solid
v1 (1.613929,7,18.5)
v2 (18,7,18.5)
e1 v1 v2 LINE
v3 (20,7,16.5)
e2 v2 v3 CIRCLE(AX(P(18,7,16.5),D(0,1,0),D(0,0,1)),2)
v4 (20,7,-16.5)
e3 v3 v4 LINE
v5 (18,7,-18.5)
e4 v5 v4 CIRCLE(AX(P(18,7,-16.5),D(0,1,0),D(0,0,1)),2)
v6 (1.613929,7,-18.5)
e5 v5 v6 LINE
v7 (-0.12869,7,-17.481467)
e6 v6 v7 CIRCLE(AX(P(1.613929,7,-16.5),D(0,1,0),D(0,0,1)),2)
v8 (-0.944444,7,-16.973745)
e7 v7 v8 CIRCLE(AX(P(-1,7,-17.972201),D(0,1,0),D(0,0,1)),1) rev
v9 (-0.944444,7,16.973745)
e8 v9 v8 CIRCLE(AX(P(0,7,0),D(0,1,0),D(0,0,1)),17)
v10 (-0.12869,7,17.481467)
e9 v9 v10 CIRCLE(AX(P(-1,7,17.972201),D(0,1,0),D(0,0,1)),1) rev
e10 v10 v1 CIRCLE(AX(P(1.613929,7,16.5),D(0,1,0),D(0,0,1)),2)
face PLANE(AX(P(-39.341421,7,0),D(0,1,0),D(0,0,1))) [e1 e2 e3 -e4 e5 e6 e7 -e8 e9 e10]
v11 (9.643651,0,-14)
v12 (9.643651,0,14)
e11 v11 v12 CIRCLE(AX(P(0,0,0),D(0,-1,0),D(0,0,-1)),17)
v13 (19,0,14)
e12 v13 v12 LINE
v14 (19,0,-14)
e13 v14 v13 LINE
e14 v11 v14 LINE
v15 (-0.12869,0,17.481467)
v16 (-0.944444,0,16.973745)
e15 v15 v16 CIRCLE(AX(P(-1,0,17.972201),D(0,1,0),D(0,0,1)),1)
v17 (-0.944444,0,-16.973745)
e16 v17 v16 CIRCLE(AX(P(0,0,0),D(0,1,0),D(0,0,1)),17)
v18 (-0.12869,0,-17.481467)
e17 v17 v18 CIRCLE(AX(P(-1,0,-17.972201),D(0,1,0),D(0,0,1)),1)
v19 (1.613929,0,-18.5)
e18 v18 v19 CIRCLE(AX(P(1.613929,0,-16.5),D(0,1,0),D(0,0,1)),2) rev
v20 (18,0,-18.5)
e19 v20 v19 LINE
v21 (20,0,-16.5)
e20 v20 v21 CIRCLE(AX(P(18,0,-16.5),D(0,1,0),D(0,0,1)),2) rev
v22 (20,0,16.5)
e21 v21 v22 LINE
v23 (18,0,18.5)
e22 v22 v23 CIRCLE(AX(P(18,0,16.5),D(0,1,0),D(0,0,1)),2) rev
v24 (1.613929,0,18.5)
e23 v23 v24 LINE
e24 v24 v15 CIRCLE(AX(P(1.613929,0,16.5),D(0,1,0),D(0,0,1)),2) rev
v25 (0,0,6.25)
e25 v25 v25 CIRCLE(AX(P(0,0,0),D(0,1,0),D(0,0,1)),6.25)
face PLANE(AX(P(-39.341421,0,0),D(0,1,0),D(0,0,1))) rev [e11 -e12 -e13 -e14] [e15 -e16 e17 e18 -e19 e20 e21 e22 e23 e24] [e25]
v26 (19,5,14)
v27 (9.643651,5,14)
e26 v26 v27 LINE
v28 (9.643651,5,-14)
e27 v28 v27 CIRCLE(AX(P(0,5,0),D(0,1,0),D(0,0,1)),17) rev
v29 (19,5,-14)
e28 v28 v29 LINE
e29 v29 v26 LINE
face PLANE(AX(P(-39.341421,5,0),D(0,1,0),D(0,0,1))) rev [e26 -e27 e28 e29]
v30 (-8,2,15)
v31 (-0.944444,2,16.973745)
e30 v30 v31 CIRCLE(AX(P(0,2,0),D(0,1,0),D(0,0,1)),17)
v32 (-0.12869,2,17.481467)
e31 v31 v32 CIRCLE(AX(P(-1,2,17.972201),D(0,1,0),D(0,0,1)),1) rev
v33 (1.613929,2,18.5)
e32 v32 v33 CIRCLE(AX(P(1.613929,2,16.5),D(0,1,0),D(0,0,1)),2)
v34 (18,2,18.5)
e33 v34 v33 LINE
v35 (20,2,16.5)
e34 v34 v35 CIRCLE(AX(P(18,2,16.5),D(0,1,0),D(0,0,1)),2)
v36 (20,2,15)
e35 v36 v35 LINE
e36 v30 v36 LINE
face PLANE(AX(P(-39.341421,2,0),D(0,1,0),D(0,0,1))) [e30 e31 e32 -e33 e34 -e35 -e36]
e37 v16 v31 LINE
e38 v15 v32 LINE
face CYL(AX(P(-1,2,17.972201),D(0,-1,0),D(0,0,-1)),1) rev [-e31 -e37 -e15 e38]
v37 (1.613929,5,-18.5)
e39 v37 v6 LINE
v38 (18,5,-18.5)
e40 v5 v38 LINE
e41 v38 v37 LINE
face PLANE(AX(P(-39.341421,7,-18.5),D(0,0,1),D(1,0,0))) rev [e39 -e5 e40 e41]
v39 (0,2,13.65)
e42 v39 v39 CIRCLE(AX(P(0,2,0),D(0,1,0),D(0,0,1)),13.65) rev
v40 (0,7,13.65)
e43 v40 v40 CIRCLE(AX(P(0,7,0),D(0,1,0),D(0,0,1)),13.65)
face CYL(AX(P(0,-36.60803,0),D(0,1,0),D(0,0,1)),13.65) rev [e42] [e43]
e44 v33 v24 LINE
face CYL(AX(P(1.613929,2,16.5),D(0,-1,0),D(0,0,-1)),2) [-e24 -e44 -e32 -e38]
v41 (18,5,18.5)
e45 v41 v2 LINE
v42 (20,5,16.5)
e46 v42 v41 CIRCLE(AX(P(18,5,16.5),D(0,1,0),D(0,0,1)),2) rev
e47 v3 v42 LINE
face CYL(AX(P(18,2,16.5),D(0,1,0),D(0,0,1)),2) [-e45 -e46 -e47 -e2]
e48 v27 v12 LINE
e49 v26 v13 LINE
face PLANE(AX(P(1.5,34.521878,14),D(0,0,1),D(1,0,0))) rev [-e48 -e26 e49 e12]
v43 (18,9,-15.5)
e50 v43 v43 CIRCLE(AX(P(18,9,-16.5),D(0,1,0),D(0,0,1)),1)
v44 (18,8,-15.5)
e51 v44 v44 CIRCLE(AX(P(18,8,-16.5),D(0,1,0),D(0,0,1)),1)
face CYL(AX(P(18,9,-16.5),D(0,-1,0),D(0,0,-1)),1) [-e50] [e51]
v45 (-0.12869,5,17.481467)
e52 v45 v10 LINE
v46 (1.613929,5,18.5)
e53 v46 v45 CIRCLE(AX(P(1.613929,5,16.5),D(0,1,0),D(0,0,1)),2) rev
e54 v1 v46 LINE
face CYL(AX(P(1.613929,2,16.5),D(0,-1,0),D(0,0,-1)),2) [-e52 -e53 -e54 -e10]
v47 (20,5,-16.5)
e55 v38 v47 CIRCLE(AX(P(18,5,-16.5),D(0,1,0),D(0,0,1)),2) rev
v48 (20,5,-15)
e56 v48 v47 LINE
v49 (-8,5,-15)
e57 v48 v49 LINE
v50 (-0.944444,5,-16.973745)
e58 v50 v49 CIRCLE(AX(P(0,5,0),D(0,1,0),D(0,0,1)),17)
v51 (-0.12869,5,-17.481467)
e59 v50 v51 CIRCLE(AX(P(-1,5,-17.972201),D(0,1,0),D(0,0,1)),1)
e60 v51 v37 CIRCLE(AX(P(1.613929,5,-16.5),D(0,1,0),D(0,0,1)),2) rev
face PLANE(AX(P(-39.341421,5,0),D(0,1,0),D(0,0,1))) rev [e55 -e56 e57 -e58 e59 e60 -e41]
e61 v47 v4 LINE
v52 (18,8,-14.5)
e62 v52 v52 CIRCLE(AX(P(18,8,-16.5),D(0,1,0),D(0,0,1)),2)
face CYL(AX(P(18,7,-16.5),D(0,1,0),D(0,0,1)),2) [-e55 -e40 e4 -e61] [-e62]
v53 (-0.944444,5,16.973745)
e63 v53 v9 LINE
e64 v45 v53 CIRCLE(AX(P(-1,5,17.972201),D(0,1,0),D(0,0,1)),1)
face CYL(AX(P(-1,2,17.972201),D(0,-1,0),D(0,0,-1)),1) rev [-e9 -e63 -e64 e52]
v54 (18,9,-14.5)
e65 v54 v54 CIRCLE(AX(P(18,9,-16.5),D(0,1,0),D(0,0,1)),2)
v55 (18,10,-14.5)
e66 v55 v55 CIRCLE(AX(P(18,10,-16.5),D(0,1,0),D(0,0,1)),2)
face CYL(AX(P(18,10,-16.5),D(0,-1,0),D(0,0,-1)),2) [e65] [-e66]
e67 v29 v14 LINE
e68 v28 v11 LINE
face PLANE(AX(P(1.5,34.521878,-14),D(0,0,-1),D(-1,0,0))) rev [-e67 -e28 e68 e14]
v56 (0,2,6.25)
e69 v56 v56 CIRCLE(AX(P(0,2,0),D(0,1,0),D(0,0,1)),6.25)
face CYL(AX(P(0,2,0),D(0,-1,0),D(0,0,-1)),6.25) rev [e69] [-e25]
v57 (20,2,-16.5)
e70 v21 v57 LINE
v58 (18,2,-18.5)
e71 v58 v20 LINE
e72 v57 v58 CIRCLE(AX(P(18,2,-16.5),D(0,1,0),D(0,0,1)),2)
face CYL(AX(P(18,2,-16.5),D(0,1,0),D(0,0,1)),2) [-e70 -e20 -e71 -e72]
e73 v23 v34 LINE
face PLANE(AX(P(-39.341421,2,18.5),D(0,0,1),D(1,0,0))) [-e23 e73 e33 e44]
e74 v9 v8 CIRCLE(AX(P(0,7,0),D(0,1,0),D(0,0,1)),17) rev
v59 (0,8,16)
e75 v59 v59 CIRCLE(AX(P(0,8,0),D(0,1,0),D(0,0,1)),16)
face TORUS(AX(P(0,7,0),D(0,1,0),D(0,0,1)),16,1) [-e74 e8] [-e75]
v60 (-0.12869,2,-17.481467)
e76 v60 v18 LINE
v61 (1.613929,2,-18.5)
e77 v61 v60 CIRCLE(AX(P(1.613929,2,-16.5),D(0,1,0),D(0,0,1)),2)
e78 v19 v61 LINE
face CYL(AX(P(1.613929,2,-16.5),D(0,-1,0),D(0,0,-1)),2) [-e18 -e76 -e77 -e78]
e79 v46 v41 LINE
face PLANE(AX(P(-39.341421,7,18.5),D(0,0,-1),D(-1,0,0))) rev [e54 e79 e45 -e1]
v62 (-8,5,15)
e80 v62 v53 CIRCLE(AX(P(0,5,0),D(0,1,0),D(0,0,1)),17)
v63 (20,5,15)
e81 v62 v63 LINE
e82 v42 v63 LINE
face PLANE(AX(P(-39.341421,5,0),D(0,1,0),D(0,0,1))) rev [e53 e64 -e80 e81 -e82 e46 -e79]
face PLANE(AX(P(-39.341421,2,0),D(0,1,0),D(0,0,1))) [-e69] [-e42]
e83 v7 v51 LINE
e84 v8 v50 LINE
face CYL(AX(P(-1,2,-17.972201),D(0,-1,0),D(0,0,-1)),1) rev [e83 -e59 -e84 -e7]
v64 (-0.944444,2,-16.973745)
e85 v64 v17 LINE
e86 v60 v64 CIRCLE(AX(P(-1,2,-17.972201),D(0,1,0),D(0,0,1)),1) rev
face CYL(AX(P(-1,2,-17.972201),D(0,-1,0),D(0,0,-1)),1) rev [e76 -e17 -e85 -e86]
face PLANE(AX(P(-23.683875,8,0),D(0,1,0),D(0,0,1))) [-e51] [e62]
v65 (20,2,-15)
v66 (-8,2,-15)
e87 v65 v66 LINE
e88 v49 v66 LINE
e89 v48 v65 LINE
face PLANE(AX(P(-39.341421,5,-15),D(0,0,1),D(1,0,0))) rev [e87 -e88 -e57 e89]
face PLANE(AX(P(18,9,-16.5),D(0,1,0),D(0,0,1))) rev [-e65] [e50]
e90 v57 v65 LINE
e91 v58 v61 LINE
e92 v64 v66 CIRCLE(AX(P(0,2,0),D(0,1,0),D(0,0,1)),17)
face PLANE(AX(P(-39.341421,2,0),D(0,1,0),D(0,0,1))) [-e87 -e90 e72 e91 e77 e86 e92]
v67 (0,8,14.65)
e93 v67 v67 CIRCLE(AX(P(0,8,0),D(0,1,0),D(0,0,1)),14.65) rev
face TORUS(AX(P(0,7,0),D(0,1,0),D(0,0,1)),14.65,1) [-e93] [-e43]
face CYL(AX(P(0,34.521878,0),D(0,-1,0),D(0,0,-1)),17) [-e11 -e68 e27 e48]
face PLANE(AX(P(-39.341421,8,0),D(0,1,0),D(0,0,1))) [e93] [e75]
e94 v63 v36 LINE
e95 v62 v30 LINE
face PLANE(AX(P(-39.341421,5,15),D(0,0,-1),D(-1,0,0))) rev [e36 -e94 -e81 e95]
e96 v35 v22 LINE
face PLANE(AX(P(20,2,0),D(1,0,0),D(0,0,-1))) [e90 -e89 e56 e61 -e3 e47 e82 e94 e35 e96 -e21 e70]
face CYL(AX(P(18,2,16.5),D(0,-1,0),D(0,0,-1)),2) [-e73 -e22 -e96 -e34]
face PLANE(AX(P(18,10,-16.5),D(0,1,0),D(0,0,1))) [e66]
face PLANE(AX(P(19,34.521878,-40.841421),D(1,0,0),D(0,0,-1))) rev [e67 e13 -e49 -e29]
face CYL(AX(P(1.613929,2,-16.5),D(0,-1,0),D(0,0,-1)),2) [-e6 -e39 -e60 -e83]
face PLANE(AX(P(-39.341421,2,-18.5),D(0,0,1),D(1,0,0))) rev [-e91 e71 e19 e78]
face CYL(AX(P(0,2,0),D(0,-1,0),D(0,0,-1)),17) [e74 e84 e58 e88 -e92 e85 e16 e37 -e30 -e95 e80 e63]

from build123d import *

# Parameters (mm, degrees)
EXTRUDE_1_DEPTH      = 2
EXTRUDE_2_DEPTH      = 3
EXTRUDE_3_DEPTH      = 2
CUT_EXTRUDE_START    = -5
SKETCH_4_R           = 13.65
SKETCH_4_R_2         = 6.25
CUT_EXTRUDE_4_DEPTH  = 5
SKETCH_4_3_R         = 13.65
EXTRUDE_5_DEPTH      = 1
FILLET_2_R           = 1
FILLET_3_R           = 2
EXTRUDE_6_DEPTH      = 1
SKETCH_6_R           = 1
EXTRUDE_7_DEPTH      = 1
SKETCH_7_R           = 2
EXTRUDE_8_DEPTH      = 1
CUT_EXTRUDE_10_DEPTH = 5


with BuildPart() as part:
    # 草图1 → 拉伸1 (new body)
    with BuildSketch(Plane(origin=(0, 0, 0), x_dir=(1, 0, 0), z_dir=(0, 1, 0))):
        with BuildLine():
            Line((0, 15), (-8, 15))
            ThreePointArc((-8, 15), (-14.577379737, 8.746427842), (-17, 0))
            ThreePointArc((-17, 0), (-14.577379737, -8.746427842), (-8, -15))
            Line((-8, -15), (0, -15))
            Line((0, -15), (0, -6.25))
            ThreePointArc((0, -6.25), (-6.25, 0), (0, 6.25))
            Line((0, 6.25), (0, 15))
        make_face()
        with BuildLine():
            Line((8, 15), (0, 15))
            Line((0, 15), (0, 6.25))
            ThreePointArc((0, 6.25), (4.419417382, 4.419417382), (6.25, 0))
            ThreePointArc((6.25, 0), (4.419417382, -4.419417382), (0, -6.25))
            Line((0, -6.25), (0, -15))
            Line((0, -15), (8, -15))
            ThreePointArc((8, -15), (14.577379737, -8.746427842), (17, 0))
            ThreePointArc((17, 0), (14.577379737, 8.746427842), (8, 15))
        make_face()
        with BuildLine():
            Line((0, 15), (-8, 15))
            ThreePointArc((-8, 15), (-14.577379737, 8.746427842), (-17, 0))
            ThreePointArc((-17, 0), (-14.577379737, -8.746427842), (-8, -15))
            Line((-8, -15), (0, -15))
            Line((0, -15), (0, -6.25))
            ThreePointArc((0, -6.25), (-6.25, 0), (0, 6.25))
            Line((0, 6.25), (0, 15))
        make_face()
        with BuildLine():
            Line((8, 15), (0, 15))
            Line((0, 15), (0, 6.25))
            ThreePointArc((0, 6.25), (4.419417382, 4.419417382), (6.25, 0))
            ThreePointArc((6.25, 0), (4.419417382, -4.419417382), (0, -6.25))
            Line((0, -6.25), (0, -15))
            Line((0, -15), (8, -15))
            ThreePointArc((8, -15), (14.577379737, -8.746427842), (17, 0))
            ThreePointArc((17, 0), (14.577379737, 8.746427842), (8, 15))
        make_face()
        with BuildLine():
            Line((20, 15), (8, 15))
            ThreePointArc((8, 15), (14.577379737, 8.746427842), (17, 0))
            ThreePointArc((17, 0), (14.577379737, -8.746427842), (8, -15))
            Line((8, -15), (20, -15))
            Line((20, -15), (20, 15))
        make_face()
        with BuildLine():
            Line((0, 18.5), (0, 17))
            ThreePointArc((0, 17), (4.123105626, 16.492422502), (8, 15))
            Line((8, 15), (20, 15))
            Line((20, 15), (20, 18.5))
            Line((20, 18.5), (0, 18.5))
        make_face()
        with BuildLine():
            ThreePointArc((8, -15), (4.123105626, -16.492422502), (0, -17))
            Line((0, -17), (0, -18.5))
            Line((0, -18.5), (20, -18.5))
            Line((20, -18.5), (20, -15))
            Line((20, -15), (8, -15))
        make_face()
        with BuildLine():
            ThreePointArc((0, 17), (-4.123105626, 16.492422502), (-8, 15))
            Line((-8, 15), (0, 15))
            Line((0, 15), (0, 17))
        make_face()
        with BuildLine():
            Line((0, 17), (0, 15))
            Line((0, 15), (8, 15))
            ThreePointArc((8, 15), (4.123105626, 16.492422502), (0, 17))
        make_face()
        with BuildLine():
            ThreePointArc((0, 17), (-4.123105626, 16.492422502), (-8, 15))
            Line((-8, 15), (0, 15))
            Line((0, 15), (0, 17))
        make_face()
        with BuildLine():
            Line((0, 17), (0, 15))
            Line((0, 15), (8, 15))
            ThreePointArc((8, 15), (4.123105626, 16.492422502), (0, 17))
        make_face()
        with BuildLine():
            Line((0, -15), (-8, -15))
            ThreePointArc((-8, -15), (-4.123105626, -16.492422502), (0, -17))
            Line((0, -17), (0, -15))
        make_face()
        with BuildLine():
            Line((8, -15), (0, -15))
            Line((0, -15), (0, -17))
            ThreePointArc((0, -17), (4.123105626, -16.492422502), (8, -15))
        make_face()
        with BuildLine():
            Line((0, -15), (-8, -15))
            ThreePointArc((-8, -15), (-4.123105626, -16.492422502), (0, -17))
            Line((0, -17), (0, -15))
        make_face()
        with BuildLine():
            Line((8, -15), (0, -15))
            Line((0, -15), (0, -17))
            ThreePointArc((0, -17), (4.123105626, -16.492422502), (8, -15))
        make_face()
    extrude(amount=EXTRUDE_1_DEPTH)

    # 草图2 → 拉伸2 (add)
    with BuildSketch(Plane(origin=(0, 2, 0), x_dir=(1, 0, 0), z_dir=(0, 1, 0))):
        with BuildLine():
            Line((0, 6.25), (0, 15))
            Line((0, 15), (-8, 15))
            ThreePointArc((-8, 15), (-14.577379737, 8.746427842), (-17, 0))
            ThreePointArc((-17, 0), (-14.577379737, -8.746427842), (-8, -15))
            Line((-8, -15), (0, -15))
            Line((0, -15), (0, -6.25))
            ThreePointArc((0, -6.25), (-6.25, 0), (0, 6.25))
        make_face()
        with BuildLine():
            ThreePointArc((17, 0), (14.577379737, 8.746427842), (8, 15))
            Line((8, 15), (0, 15))
            Line((0, 15), (0, 6.25))
            ThreePointArc((0, 6.25), (4.419417382, 4.419417382), (6.25, 0))
            ThreePointArc((6.25, 0), (4.419417382, -4.419417382), (0, -6.25))
            Line((0, -6.25), (0, -15))
            Line((0, -15), (8, -15))
            ThreePointArc((8, -15), (14.577379737, -8.746427842), (17, 0))
        make_face()
        with BuildLine():
            Line((0, 6.25), (0, 15))
            Line((0, 15), (-8, 15))
            ThreePointArc((-8, 15), (-14.577379737, 8.746427842), (-17, 0))
            ThreePointArc((-17, 0), (-14.577379737, -8.746427842), (-8, -15))
            Line((-8, -15), (0, -15))
            Line((0, -15), (0, -6.25))
            ThreePointArc((0, -6.25), (-6.25, 0), (0, 6.25))
        make_face()
        with BuildLine():
            Line((20, -15), (20, 15))
            Line((20, 15), (8, 15))
            ThreePointArc((8, 15), (14.577379737, 8.746427842), (17, 0))
            ThreePointArc((17, 0), (14.577379737, -8.746427842), (8, -15))
            Line((8, -15), (20, -15))
        make_face()
    extrude(amount=EXTRUDE_2_DEPTH)

    # 草图3 → 拉伸3 (add)
    with BuildSketch(Plane(origin=(0, 5, 0), x_dir=(1, 0, 0), z_dir=(0, 1, 0))):
        with BuildLine():
            Line((0, 6.25), (0, 15))
            Line((0, 15), (-8, 15))
            ThreePointArc((-8, 15), (-14.577379738, 8.746427841), (-17, -3e-09))
            ThreePointArc((-17, -3e-09), (-14.577379736, -8.746427843), (-8, -15))
            Line((-8, -15), (0, -15))
            Line((0, -15), (0, -6.25))
            ThreePointArc((0, -6.25), (-6.25, 0), (0, 6.25))
        make_face()
        with BuildLine():
            ThreePointArc((8, 15), (4.123105626, 16.492422502), (0, 17))
            Line((0, 17), (0, 15))
            Line((0, 15), (8, 15))
        make_face()
        with BuildLine():
            Line((0, 15), (0, 17))
            ThreePointArc((0, 17), (-4.123105626, 16.492422502), (-8, 15))
            Line((-8, 15), (0, 15))
        make_face()
        with BuildLine():
            ThreePointArc((8, 15), (4.123105626, 16.492422502), (0, 17))
            Line((0, 17), (0, 15))
            Line((0, 15), (8, 15))
        make_face()
        with BuildLine():
            Line((0, 15), (0, 17))
            ThreePointArc((0, 17), (-4.123105626, 16.492422502), (-8, 15))
            Line((-8, 15), (0, 15))
        make_face()
        with BuildLine():
            ThreePointArc((17, 0), (14.577379737, 8.746427842), (8, 15))
            Line((8, 15), (0, 15))
            Line((0, 15), (0, 6.25))
            ThreePointArc((0, 6.25), (4.419417382, 4.419417382), (6.25, 0))
            ThreePointArc((6.25, 0), (4.419417382, -4.419417382), (0, -6.25))
            Line((0, -6.25), (0, -15))
            Line((0, -15), (8, -15))
            ThreePointArc((8, -15), (14.577379737, -8.746427842), (17, 0))
        make_face()
        with BuildLine():
            Line((0, 6.25), (0, 15))
            Line((0, 15), (-8, 15))
            ThreePointArc((-8, 15), (-14.577379738, 8.746427841), (-17, -3e-09))
            ThreePointArc((-17, -3e-09), (-14.577379736, -8.746427843), (-8, -15))
            Line((-8, -15), (0, -15))
            Line((0, -15), (0, -6.25))
            ThreePointArc((0, -6.25), (-6.25, 0), (0, 6.25))
        make_face()
        with BuildLine():
            ThreePointArc((0, -17), (4.123105626, -16.492422502), (8, -15))
            Line((8, -15), (0, -15))
            Line((0, -15), (0, -17))
        make_face()
        with BuildLine():
            Line((0, -17), (0, -15))
            Line((0, -15), (-8, -15))
            ThreePointArc((-8, -15), (-4.123105626, -16.492422502), (0, -17))
        make_face()
        with BuildLine():
            ThreePointArc((0, -17), (4.123105626, -16.492422502), (8, -15))
            Line((8, -15), (0, -15))
            Line((0, -15), (0, -17))
        make_face()
        with BuildLine():
            Line((0, -17), (0, -15))
            Line((0, -15), (-8, -15))
            ThreePointArc((-8, -15), (-4.123105626, -16.492422502), (0, -17))
        make_face()
        with BuildLine():
            Line((20, -15), (20, 15))
            Line((20, 15), (8, 15))
            ThreePointArc((8, 15), (14.577379737, 8.746427842), (17, 0))
            ThreePointArc((17, 0), (14.577379737, -8.746427842), (8, -15))
            Line((8, -15), (20, -15))
        make_face()
        with BuildLine():
            Line((20, 15), (20, 18.5))
            Line((20, 18.5), (0, 18.5))
            Line((0, 18.5), (0, 17))
            ThreePointArc((0, 17), (4.123105626, 16.492422502), (8, 15))
            Line((8, 15), (20, 15))
        make_face()
        with BuildLine():
            Line((20, -18.5), (20, -15))
            Line((20, -15), (8, -15))
            ThreePointArc((8, -15), (4.123105626, -16.492422502), (0, -17))
            Line((0, -17), (0, -18.5))
            Line((0, -18.5), (20, -18.5))
        make_face()
    extrude(amount=EXTRUDE_3_DEPTH)

    # 草图4 → 拉伸4 (cut)
    with BuildSketch(Plane(origin=(0, 7, 0), x_dir=(1, 0, 0), z_dir=(0, 1, 0)).offset(CUT_EXTRUDE_START)):
        with Locations(Location((0, 0, 0), (0, 0, 270))):
            Circle(SKETCH_4_R)
        with Locations(Location((0, 0, 0), (0, 0, 270))):
            Circle(SKETCH_4_R_2, mode=Mode.SUBTRACT)
    extrude(amount=CUT_EXTRUDE_4_DEPTH, mode=Mode.SUBTRACT)

    # 草图4<3> → 拉伸5 (add)
    with BuildSketch(Plane(origin=(0, 7, 0), x_dir=(1, 0, 0), z_dir=(0, 1, 0))):
        with BuildLine():
            ThreePointArc((0, 17), (-17, 0), (0, -17))
            ThreePointArc((0, -17), (12.02081528, -12.02081528), (17, 0))
            ThreePointArc((17, 0), (12.02081528, 12.02081528), (0, 17))
        make_face()
        with Locations(Location((0, 0, 0), (0, 0, 270))):
            Circle(SKETCH_4_3_R, mode=Mode.SUBTRACT)
    extrude(amount=EXTRUDE_5_DEPTH)

    # 圆角1: read off the stored shape, not the designer's step
    # 圆角1 outline → 圆角1 (revolve, cut)
    with BuildSketch(Plane.XY):
        with BuildLine():
            ThreePointArc((16, 8), (16.707106781, 7.707106781), (17, 7))
            Line((17, 7), (17, 8))
            Line((17, 8), (16, 8))
        make_face()
        with BuildLine():
            ThreePointArc((13.65, 7), (13.942893219, 7.707106781), (14.65, 8))
            Line((14.65, 8), (13.65, 8))
            Line((13.65, 8), (13.65, 7))
        make_face()
    revolve(axis=Axis((0, 0, 0), (0, 1, 0)), mode=Mode.SUBTRACT)

    # 圆角2
    # the kernel refuses this fillet: 1 mm, written as the material it adds along each edge
    with BuildSketch(Plane(origin=(0, 0, -17), x_dir=(-0.9996138248178563, 0, 0.027788509010311935), z_dir=(0, 1, 0)), Plane(origin=(0, 5, -17), x_dir=(-0.9996138248178565, 0, 0.027788509010305), z_dir=(0, 1, 0))) as fillet_2_piece_1:
        with BuildLine():
            CenterArc((0.972597815, -0.999613825), FILLET_2_R, 91.592369268, 86.815261463)
            Line((-0.027016009, -0.971825316), (0, 0))
            ThreePointArc((0, 0), (0.472404653, -0.006564978), (0.944809306, 0))
        make_face()
    extrude(amount=2)
    with BuildSketch(Plane(origin=(0, 0, 17), x_dir=(-0.9996138248178561, 0, -0.027788509010319186), z_dir=(0, 1, 0)), Plane(origin=(0, 5, 17), x_dir=(-0.9996138248178563, 0, -0.027788509010312518), z_dir=(0, 1, 0))) as fillet_2_piece_2:
        with BuildLine():
            CenterArc((0.972597815, 0.999613825), FILLET_2_R, 181.592369268, 86.815261463)
            Line((-0.027016009, 0.971825316), (0, 0))
            ThreePointArc((0, 0), (0.472404653, 0.006564978), (0.944809306, 0))
        make_face()
    extrude(amount=2)

    # 圆角3
    # the kernel refuses this fillet: 2 mm, written as the material it takes off along each edge
    with BuildSketch(Plane(origin=(0, -4.034822556, -18.5), x_dir=(-0.12535212734236612, 0, 0.992112314292461), z_dir=(0, 1, 0))) as fillet_3_piece_1:
        with BuildLine():
            CenterArc((1.781915192, 1.851903112), FILLET_3_R, 187.201091139, 60.611190589)
            Line((-0.202309436, 1.601198858), (-0.400731899, 1.576128432))
            Line((-0.400731899, 1.576128432), (-0.198422463, -0.025070425))
            Line((-0.198422463, -0.025070425), (0.025070425, -0.198422463))
            ThreePointArc((0.025070425, -0.198422463), (0.548706555, -0.132261705), (0.951102107, -0.185190311))
            Line((0.951102107, -0.185190311), (1.026630569, 0))
        make_face()
    extrude(amount=10.069645113, mode=Mode.SUBTRACT)
    with BuildSketch(Plane(origin=(20, -5, -18.5), x_dir=(0, 0, 1), z_dir=(0, 1, 0)), Plane(origin=(20, 0, 18.5), x_dir=(-1, 0, 0), z_dir=(0, 1, 0)), Plane(origin=(20, 0, -18.5), x_dir=(0, 0, 1), z_dir=(0, 1, 0))) as fillet_3_piece_2:
        with BuildLine():
            CenterArc((FILLET_3_R, -FILLET_3_R), FILLET_3_R, 90, 90)
            Line((0, -FILLET_3_R), (0, 0))
            Line((0, 0), (FILLET_3_R, 0))
        make_face()
    extrude(amount=12, mode=Mode.SUBTRACT)
    with BuildSketch(Plane(origin=(20, -5, 18.5), x_dir=(0, 0, -1), z_dir=(0, 1, 0))) as fillet_3_piece_3:
        with BuildLine():
            CenterArc((FILLET_3_R, FILLET_3_R), FILLET_3_R, 180, 90)
            Line((0, FILLET_3_R), (0, 0))
            Line((0, 0), (FILLET_3_R, 0))
        make_face()
    extrude(amount=12, mode=Mode.SUBTRACT)
    with BuildSketch(Plane(origin=(0, -4.034822556, 18.5), x_dir=(-0.12535212734236506, 0, -0.9921123142924613), z_dir=(0, 1, 0))) as fillet_3_piece_4:
        with BuildLine():
            CenterArc((1.781915192, -1.851903112), FILLET_3_R, 112.187718272, 60.611190589)
            Line((-0.202309436, -1.601198858), (-0.400731899, -1.576128432))
            Line((-0.400731899, -1.576128432), (-0.198422463, 0.025070425))
            Line((-0.198422463, 0.025070425), (0.025070425, 0.198422463))
            ThreePointArc((0.025070425, 0.198422463), (0.548706555, 0.132261705), (0.951102107, 0.185190311))
            Line((0.951102107, 0.185190311), (1.026630569, 0))
        make_face()
    extrude(amount=10.069645113, mode=Mode.SUBTRACT)
    with BuildSketch(Plane(origin=(0, 0.965177444, 18.5), x_dir=(1, 0, 0), z_dir=(0, 1, 0))) as fillet_3_piece_5:
        with BuildLine():
            CenterArc((1.613929023, 2), FILLET_3_R, 209.388809411, 60.611190589)
            Line((-0.128690326, 1.01853283), (-0.302952261, 0.920386113))
            ThreePointArc((-0.302952261, 0.920386113), (-0.2, 0.527799244), (-0.2, 0))
            Line((-0.2, 0), (0, -0.2))
            Line((0, -0.2), (1.613929023, -0.2))
            Line((1.613929023, -0.2), (1.613929023, 0))
        make_face()
    extrude(amount=10.069645113, mode=Mode.SUBTRACT)
    with BuildSketch(Plane(origin=(0, 0.965177444, -18.5), x_dir=(1, 0, 0), z_dir=(0, 1, 0))) as fillet_3_piece_6:
        with BuildLine():
            CenterArc((1.613929023, -2), FILLET_3_R, 90, 60.611190589)
            Line((-0.128690326, -1.01853283), (-0.302952261, -0.920386113))
            ThreePointArc((-0.302952261, -0.920386113), (-0.2, -0.527799244), (-0.2, 0))
            Line((-0.2, 0), (0, 0.2))
            Line((0, 0.2), (1.613929023, 0.2))
            Line((1.613929023, 0.2), (1.613929023, 0))
        make_face()
    extrude(amount=10.069645113, mode=Mode.SUBTRACT)

    # 草图5 → 拉伸6 (add)
    with BuildSketch(Plane(origin=(0, 7, 0), x_dir=(1, 0, 0), z_dir=(0, 1, 0))):
        with BuildLine():
            ThreePointArc((18, 18.5), (16.585786438, 15.085786438), (20, 16.5))
            ThreePointArc((20, 16.5), (19.414213562, 17.914213562), (18, 18.5))
        make_face()
    extrude(amount=EXTRUDE_6_DEPTH)

    # 草图6 → 拉伸7 (add)
    with BuildSketch(Plane(origin=(0, 8, 0), x_dir=(1, 0, 0), z_dir=(0, 1, 0))):
        with Locations(Location((18, 16.5, 0), (0, 0, 270))):
            Circle(SKETCH_6_R)
    extrude(amount=EXTRUDE_7_DEPTH)

    # 草图7 → 拉伸8 (add)
    with BuildSketch(Plane(origin=(0, 9, 0), x_dir=(1, 0, 0), z_dir=(0, 1, 0))):
        with Locations(Location((18, 16.5, 0), (0, 0, 270))):
            Circle(SKETCH_7_R)
    extrude(amount=EXTRUDE_8_DEPTH)

    # 草图8 → 拉伸10 (cut)
    with BuildSketch(Plane.XZ):
        with BuildLine():
            Line((9.643650761, -14), (19, -14))
            Line((19, -14), (19, 14))
            Line((19, 14), (9.643650761, 14))
            ThreePointArc((9.643650761, 14), (15.048954498, 7.907526069), (17, 0))
            ThreePointArc((17, 0), (15.048954498, -7.907526069), (9.643650761, -14))
        make_face()
    extrude(amount=-CUT_EXTRUDE_10_DEPTH, mode=Mode.SUBTRACT)


solid = part.part
